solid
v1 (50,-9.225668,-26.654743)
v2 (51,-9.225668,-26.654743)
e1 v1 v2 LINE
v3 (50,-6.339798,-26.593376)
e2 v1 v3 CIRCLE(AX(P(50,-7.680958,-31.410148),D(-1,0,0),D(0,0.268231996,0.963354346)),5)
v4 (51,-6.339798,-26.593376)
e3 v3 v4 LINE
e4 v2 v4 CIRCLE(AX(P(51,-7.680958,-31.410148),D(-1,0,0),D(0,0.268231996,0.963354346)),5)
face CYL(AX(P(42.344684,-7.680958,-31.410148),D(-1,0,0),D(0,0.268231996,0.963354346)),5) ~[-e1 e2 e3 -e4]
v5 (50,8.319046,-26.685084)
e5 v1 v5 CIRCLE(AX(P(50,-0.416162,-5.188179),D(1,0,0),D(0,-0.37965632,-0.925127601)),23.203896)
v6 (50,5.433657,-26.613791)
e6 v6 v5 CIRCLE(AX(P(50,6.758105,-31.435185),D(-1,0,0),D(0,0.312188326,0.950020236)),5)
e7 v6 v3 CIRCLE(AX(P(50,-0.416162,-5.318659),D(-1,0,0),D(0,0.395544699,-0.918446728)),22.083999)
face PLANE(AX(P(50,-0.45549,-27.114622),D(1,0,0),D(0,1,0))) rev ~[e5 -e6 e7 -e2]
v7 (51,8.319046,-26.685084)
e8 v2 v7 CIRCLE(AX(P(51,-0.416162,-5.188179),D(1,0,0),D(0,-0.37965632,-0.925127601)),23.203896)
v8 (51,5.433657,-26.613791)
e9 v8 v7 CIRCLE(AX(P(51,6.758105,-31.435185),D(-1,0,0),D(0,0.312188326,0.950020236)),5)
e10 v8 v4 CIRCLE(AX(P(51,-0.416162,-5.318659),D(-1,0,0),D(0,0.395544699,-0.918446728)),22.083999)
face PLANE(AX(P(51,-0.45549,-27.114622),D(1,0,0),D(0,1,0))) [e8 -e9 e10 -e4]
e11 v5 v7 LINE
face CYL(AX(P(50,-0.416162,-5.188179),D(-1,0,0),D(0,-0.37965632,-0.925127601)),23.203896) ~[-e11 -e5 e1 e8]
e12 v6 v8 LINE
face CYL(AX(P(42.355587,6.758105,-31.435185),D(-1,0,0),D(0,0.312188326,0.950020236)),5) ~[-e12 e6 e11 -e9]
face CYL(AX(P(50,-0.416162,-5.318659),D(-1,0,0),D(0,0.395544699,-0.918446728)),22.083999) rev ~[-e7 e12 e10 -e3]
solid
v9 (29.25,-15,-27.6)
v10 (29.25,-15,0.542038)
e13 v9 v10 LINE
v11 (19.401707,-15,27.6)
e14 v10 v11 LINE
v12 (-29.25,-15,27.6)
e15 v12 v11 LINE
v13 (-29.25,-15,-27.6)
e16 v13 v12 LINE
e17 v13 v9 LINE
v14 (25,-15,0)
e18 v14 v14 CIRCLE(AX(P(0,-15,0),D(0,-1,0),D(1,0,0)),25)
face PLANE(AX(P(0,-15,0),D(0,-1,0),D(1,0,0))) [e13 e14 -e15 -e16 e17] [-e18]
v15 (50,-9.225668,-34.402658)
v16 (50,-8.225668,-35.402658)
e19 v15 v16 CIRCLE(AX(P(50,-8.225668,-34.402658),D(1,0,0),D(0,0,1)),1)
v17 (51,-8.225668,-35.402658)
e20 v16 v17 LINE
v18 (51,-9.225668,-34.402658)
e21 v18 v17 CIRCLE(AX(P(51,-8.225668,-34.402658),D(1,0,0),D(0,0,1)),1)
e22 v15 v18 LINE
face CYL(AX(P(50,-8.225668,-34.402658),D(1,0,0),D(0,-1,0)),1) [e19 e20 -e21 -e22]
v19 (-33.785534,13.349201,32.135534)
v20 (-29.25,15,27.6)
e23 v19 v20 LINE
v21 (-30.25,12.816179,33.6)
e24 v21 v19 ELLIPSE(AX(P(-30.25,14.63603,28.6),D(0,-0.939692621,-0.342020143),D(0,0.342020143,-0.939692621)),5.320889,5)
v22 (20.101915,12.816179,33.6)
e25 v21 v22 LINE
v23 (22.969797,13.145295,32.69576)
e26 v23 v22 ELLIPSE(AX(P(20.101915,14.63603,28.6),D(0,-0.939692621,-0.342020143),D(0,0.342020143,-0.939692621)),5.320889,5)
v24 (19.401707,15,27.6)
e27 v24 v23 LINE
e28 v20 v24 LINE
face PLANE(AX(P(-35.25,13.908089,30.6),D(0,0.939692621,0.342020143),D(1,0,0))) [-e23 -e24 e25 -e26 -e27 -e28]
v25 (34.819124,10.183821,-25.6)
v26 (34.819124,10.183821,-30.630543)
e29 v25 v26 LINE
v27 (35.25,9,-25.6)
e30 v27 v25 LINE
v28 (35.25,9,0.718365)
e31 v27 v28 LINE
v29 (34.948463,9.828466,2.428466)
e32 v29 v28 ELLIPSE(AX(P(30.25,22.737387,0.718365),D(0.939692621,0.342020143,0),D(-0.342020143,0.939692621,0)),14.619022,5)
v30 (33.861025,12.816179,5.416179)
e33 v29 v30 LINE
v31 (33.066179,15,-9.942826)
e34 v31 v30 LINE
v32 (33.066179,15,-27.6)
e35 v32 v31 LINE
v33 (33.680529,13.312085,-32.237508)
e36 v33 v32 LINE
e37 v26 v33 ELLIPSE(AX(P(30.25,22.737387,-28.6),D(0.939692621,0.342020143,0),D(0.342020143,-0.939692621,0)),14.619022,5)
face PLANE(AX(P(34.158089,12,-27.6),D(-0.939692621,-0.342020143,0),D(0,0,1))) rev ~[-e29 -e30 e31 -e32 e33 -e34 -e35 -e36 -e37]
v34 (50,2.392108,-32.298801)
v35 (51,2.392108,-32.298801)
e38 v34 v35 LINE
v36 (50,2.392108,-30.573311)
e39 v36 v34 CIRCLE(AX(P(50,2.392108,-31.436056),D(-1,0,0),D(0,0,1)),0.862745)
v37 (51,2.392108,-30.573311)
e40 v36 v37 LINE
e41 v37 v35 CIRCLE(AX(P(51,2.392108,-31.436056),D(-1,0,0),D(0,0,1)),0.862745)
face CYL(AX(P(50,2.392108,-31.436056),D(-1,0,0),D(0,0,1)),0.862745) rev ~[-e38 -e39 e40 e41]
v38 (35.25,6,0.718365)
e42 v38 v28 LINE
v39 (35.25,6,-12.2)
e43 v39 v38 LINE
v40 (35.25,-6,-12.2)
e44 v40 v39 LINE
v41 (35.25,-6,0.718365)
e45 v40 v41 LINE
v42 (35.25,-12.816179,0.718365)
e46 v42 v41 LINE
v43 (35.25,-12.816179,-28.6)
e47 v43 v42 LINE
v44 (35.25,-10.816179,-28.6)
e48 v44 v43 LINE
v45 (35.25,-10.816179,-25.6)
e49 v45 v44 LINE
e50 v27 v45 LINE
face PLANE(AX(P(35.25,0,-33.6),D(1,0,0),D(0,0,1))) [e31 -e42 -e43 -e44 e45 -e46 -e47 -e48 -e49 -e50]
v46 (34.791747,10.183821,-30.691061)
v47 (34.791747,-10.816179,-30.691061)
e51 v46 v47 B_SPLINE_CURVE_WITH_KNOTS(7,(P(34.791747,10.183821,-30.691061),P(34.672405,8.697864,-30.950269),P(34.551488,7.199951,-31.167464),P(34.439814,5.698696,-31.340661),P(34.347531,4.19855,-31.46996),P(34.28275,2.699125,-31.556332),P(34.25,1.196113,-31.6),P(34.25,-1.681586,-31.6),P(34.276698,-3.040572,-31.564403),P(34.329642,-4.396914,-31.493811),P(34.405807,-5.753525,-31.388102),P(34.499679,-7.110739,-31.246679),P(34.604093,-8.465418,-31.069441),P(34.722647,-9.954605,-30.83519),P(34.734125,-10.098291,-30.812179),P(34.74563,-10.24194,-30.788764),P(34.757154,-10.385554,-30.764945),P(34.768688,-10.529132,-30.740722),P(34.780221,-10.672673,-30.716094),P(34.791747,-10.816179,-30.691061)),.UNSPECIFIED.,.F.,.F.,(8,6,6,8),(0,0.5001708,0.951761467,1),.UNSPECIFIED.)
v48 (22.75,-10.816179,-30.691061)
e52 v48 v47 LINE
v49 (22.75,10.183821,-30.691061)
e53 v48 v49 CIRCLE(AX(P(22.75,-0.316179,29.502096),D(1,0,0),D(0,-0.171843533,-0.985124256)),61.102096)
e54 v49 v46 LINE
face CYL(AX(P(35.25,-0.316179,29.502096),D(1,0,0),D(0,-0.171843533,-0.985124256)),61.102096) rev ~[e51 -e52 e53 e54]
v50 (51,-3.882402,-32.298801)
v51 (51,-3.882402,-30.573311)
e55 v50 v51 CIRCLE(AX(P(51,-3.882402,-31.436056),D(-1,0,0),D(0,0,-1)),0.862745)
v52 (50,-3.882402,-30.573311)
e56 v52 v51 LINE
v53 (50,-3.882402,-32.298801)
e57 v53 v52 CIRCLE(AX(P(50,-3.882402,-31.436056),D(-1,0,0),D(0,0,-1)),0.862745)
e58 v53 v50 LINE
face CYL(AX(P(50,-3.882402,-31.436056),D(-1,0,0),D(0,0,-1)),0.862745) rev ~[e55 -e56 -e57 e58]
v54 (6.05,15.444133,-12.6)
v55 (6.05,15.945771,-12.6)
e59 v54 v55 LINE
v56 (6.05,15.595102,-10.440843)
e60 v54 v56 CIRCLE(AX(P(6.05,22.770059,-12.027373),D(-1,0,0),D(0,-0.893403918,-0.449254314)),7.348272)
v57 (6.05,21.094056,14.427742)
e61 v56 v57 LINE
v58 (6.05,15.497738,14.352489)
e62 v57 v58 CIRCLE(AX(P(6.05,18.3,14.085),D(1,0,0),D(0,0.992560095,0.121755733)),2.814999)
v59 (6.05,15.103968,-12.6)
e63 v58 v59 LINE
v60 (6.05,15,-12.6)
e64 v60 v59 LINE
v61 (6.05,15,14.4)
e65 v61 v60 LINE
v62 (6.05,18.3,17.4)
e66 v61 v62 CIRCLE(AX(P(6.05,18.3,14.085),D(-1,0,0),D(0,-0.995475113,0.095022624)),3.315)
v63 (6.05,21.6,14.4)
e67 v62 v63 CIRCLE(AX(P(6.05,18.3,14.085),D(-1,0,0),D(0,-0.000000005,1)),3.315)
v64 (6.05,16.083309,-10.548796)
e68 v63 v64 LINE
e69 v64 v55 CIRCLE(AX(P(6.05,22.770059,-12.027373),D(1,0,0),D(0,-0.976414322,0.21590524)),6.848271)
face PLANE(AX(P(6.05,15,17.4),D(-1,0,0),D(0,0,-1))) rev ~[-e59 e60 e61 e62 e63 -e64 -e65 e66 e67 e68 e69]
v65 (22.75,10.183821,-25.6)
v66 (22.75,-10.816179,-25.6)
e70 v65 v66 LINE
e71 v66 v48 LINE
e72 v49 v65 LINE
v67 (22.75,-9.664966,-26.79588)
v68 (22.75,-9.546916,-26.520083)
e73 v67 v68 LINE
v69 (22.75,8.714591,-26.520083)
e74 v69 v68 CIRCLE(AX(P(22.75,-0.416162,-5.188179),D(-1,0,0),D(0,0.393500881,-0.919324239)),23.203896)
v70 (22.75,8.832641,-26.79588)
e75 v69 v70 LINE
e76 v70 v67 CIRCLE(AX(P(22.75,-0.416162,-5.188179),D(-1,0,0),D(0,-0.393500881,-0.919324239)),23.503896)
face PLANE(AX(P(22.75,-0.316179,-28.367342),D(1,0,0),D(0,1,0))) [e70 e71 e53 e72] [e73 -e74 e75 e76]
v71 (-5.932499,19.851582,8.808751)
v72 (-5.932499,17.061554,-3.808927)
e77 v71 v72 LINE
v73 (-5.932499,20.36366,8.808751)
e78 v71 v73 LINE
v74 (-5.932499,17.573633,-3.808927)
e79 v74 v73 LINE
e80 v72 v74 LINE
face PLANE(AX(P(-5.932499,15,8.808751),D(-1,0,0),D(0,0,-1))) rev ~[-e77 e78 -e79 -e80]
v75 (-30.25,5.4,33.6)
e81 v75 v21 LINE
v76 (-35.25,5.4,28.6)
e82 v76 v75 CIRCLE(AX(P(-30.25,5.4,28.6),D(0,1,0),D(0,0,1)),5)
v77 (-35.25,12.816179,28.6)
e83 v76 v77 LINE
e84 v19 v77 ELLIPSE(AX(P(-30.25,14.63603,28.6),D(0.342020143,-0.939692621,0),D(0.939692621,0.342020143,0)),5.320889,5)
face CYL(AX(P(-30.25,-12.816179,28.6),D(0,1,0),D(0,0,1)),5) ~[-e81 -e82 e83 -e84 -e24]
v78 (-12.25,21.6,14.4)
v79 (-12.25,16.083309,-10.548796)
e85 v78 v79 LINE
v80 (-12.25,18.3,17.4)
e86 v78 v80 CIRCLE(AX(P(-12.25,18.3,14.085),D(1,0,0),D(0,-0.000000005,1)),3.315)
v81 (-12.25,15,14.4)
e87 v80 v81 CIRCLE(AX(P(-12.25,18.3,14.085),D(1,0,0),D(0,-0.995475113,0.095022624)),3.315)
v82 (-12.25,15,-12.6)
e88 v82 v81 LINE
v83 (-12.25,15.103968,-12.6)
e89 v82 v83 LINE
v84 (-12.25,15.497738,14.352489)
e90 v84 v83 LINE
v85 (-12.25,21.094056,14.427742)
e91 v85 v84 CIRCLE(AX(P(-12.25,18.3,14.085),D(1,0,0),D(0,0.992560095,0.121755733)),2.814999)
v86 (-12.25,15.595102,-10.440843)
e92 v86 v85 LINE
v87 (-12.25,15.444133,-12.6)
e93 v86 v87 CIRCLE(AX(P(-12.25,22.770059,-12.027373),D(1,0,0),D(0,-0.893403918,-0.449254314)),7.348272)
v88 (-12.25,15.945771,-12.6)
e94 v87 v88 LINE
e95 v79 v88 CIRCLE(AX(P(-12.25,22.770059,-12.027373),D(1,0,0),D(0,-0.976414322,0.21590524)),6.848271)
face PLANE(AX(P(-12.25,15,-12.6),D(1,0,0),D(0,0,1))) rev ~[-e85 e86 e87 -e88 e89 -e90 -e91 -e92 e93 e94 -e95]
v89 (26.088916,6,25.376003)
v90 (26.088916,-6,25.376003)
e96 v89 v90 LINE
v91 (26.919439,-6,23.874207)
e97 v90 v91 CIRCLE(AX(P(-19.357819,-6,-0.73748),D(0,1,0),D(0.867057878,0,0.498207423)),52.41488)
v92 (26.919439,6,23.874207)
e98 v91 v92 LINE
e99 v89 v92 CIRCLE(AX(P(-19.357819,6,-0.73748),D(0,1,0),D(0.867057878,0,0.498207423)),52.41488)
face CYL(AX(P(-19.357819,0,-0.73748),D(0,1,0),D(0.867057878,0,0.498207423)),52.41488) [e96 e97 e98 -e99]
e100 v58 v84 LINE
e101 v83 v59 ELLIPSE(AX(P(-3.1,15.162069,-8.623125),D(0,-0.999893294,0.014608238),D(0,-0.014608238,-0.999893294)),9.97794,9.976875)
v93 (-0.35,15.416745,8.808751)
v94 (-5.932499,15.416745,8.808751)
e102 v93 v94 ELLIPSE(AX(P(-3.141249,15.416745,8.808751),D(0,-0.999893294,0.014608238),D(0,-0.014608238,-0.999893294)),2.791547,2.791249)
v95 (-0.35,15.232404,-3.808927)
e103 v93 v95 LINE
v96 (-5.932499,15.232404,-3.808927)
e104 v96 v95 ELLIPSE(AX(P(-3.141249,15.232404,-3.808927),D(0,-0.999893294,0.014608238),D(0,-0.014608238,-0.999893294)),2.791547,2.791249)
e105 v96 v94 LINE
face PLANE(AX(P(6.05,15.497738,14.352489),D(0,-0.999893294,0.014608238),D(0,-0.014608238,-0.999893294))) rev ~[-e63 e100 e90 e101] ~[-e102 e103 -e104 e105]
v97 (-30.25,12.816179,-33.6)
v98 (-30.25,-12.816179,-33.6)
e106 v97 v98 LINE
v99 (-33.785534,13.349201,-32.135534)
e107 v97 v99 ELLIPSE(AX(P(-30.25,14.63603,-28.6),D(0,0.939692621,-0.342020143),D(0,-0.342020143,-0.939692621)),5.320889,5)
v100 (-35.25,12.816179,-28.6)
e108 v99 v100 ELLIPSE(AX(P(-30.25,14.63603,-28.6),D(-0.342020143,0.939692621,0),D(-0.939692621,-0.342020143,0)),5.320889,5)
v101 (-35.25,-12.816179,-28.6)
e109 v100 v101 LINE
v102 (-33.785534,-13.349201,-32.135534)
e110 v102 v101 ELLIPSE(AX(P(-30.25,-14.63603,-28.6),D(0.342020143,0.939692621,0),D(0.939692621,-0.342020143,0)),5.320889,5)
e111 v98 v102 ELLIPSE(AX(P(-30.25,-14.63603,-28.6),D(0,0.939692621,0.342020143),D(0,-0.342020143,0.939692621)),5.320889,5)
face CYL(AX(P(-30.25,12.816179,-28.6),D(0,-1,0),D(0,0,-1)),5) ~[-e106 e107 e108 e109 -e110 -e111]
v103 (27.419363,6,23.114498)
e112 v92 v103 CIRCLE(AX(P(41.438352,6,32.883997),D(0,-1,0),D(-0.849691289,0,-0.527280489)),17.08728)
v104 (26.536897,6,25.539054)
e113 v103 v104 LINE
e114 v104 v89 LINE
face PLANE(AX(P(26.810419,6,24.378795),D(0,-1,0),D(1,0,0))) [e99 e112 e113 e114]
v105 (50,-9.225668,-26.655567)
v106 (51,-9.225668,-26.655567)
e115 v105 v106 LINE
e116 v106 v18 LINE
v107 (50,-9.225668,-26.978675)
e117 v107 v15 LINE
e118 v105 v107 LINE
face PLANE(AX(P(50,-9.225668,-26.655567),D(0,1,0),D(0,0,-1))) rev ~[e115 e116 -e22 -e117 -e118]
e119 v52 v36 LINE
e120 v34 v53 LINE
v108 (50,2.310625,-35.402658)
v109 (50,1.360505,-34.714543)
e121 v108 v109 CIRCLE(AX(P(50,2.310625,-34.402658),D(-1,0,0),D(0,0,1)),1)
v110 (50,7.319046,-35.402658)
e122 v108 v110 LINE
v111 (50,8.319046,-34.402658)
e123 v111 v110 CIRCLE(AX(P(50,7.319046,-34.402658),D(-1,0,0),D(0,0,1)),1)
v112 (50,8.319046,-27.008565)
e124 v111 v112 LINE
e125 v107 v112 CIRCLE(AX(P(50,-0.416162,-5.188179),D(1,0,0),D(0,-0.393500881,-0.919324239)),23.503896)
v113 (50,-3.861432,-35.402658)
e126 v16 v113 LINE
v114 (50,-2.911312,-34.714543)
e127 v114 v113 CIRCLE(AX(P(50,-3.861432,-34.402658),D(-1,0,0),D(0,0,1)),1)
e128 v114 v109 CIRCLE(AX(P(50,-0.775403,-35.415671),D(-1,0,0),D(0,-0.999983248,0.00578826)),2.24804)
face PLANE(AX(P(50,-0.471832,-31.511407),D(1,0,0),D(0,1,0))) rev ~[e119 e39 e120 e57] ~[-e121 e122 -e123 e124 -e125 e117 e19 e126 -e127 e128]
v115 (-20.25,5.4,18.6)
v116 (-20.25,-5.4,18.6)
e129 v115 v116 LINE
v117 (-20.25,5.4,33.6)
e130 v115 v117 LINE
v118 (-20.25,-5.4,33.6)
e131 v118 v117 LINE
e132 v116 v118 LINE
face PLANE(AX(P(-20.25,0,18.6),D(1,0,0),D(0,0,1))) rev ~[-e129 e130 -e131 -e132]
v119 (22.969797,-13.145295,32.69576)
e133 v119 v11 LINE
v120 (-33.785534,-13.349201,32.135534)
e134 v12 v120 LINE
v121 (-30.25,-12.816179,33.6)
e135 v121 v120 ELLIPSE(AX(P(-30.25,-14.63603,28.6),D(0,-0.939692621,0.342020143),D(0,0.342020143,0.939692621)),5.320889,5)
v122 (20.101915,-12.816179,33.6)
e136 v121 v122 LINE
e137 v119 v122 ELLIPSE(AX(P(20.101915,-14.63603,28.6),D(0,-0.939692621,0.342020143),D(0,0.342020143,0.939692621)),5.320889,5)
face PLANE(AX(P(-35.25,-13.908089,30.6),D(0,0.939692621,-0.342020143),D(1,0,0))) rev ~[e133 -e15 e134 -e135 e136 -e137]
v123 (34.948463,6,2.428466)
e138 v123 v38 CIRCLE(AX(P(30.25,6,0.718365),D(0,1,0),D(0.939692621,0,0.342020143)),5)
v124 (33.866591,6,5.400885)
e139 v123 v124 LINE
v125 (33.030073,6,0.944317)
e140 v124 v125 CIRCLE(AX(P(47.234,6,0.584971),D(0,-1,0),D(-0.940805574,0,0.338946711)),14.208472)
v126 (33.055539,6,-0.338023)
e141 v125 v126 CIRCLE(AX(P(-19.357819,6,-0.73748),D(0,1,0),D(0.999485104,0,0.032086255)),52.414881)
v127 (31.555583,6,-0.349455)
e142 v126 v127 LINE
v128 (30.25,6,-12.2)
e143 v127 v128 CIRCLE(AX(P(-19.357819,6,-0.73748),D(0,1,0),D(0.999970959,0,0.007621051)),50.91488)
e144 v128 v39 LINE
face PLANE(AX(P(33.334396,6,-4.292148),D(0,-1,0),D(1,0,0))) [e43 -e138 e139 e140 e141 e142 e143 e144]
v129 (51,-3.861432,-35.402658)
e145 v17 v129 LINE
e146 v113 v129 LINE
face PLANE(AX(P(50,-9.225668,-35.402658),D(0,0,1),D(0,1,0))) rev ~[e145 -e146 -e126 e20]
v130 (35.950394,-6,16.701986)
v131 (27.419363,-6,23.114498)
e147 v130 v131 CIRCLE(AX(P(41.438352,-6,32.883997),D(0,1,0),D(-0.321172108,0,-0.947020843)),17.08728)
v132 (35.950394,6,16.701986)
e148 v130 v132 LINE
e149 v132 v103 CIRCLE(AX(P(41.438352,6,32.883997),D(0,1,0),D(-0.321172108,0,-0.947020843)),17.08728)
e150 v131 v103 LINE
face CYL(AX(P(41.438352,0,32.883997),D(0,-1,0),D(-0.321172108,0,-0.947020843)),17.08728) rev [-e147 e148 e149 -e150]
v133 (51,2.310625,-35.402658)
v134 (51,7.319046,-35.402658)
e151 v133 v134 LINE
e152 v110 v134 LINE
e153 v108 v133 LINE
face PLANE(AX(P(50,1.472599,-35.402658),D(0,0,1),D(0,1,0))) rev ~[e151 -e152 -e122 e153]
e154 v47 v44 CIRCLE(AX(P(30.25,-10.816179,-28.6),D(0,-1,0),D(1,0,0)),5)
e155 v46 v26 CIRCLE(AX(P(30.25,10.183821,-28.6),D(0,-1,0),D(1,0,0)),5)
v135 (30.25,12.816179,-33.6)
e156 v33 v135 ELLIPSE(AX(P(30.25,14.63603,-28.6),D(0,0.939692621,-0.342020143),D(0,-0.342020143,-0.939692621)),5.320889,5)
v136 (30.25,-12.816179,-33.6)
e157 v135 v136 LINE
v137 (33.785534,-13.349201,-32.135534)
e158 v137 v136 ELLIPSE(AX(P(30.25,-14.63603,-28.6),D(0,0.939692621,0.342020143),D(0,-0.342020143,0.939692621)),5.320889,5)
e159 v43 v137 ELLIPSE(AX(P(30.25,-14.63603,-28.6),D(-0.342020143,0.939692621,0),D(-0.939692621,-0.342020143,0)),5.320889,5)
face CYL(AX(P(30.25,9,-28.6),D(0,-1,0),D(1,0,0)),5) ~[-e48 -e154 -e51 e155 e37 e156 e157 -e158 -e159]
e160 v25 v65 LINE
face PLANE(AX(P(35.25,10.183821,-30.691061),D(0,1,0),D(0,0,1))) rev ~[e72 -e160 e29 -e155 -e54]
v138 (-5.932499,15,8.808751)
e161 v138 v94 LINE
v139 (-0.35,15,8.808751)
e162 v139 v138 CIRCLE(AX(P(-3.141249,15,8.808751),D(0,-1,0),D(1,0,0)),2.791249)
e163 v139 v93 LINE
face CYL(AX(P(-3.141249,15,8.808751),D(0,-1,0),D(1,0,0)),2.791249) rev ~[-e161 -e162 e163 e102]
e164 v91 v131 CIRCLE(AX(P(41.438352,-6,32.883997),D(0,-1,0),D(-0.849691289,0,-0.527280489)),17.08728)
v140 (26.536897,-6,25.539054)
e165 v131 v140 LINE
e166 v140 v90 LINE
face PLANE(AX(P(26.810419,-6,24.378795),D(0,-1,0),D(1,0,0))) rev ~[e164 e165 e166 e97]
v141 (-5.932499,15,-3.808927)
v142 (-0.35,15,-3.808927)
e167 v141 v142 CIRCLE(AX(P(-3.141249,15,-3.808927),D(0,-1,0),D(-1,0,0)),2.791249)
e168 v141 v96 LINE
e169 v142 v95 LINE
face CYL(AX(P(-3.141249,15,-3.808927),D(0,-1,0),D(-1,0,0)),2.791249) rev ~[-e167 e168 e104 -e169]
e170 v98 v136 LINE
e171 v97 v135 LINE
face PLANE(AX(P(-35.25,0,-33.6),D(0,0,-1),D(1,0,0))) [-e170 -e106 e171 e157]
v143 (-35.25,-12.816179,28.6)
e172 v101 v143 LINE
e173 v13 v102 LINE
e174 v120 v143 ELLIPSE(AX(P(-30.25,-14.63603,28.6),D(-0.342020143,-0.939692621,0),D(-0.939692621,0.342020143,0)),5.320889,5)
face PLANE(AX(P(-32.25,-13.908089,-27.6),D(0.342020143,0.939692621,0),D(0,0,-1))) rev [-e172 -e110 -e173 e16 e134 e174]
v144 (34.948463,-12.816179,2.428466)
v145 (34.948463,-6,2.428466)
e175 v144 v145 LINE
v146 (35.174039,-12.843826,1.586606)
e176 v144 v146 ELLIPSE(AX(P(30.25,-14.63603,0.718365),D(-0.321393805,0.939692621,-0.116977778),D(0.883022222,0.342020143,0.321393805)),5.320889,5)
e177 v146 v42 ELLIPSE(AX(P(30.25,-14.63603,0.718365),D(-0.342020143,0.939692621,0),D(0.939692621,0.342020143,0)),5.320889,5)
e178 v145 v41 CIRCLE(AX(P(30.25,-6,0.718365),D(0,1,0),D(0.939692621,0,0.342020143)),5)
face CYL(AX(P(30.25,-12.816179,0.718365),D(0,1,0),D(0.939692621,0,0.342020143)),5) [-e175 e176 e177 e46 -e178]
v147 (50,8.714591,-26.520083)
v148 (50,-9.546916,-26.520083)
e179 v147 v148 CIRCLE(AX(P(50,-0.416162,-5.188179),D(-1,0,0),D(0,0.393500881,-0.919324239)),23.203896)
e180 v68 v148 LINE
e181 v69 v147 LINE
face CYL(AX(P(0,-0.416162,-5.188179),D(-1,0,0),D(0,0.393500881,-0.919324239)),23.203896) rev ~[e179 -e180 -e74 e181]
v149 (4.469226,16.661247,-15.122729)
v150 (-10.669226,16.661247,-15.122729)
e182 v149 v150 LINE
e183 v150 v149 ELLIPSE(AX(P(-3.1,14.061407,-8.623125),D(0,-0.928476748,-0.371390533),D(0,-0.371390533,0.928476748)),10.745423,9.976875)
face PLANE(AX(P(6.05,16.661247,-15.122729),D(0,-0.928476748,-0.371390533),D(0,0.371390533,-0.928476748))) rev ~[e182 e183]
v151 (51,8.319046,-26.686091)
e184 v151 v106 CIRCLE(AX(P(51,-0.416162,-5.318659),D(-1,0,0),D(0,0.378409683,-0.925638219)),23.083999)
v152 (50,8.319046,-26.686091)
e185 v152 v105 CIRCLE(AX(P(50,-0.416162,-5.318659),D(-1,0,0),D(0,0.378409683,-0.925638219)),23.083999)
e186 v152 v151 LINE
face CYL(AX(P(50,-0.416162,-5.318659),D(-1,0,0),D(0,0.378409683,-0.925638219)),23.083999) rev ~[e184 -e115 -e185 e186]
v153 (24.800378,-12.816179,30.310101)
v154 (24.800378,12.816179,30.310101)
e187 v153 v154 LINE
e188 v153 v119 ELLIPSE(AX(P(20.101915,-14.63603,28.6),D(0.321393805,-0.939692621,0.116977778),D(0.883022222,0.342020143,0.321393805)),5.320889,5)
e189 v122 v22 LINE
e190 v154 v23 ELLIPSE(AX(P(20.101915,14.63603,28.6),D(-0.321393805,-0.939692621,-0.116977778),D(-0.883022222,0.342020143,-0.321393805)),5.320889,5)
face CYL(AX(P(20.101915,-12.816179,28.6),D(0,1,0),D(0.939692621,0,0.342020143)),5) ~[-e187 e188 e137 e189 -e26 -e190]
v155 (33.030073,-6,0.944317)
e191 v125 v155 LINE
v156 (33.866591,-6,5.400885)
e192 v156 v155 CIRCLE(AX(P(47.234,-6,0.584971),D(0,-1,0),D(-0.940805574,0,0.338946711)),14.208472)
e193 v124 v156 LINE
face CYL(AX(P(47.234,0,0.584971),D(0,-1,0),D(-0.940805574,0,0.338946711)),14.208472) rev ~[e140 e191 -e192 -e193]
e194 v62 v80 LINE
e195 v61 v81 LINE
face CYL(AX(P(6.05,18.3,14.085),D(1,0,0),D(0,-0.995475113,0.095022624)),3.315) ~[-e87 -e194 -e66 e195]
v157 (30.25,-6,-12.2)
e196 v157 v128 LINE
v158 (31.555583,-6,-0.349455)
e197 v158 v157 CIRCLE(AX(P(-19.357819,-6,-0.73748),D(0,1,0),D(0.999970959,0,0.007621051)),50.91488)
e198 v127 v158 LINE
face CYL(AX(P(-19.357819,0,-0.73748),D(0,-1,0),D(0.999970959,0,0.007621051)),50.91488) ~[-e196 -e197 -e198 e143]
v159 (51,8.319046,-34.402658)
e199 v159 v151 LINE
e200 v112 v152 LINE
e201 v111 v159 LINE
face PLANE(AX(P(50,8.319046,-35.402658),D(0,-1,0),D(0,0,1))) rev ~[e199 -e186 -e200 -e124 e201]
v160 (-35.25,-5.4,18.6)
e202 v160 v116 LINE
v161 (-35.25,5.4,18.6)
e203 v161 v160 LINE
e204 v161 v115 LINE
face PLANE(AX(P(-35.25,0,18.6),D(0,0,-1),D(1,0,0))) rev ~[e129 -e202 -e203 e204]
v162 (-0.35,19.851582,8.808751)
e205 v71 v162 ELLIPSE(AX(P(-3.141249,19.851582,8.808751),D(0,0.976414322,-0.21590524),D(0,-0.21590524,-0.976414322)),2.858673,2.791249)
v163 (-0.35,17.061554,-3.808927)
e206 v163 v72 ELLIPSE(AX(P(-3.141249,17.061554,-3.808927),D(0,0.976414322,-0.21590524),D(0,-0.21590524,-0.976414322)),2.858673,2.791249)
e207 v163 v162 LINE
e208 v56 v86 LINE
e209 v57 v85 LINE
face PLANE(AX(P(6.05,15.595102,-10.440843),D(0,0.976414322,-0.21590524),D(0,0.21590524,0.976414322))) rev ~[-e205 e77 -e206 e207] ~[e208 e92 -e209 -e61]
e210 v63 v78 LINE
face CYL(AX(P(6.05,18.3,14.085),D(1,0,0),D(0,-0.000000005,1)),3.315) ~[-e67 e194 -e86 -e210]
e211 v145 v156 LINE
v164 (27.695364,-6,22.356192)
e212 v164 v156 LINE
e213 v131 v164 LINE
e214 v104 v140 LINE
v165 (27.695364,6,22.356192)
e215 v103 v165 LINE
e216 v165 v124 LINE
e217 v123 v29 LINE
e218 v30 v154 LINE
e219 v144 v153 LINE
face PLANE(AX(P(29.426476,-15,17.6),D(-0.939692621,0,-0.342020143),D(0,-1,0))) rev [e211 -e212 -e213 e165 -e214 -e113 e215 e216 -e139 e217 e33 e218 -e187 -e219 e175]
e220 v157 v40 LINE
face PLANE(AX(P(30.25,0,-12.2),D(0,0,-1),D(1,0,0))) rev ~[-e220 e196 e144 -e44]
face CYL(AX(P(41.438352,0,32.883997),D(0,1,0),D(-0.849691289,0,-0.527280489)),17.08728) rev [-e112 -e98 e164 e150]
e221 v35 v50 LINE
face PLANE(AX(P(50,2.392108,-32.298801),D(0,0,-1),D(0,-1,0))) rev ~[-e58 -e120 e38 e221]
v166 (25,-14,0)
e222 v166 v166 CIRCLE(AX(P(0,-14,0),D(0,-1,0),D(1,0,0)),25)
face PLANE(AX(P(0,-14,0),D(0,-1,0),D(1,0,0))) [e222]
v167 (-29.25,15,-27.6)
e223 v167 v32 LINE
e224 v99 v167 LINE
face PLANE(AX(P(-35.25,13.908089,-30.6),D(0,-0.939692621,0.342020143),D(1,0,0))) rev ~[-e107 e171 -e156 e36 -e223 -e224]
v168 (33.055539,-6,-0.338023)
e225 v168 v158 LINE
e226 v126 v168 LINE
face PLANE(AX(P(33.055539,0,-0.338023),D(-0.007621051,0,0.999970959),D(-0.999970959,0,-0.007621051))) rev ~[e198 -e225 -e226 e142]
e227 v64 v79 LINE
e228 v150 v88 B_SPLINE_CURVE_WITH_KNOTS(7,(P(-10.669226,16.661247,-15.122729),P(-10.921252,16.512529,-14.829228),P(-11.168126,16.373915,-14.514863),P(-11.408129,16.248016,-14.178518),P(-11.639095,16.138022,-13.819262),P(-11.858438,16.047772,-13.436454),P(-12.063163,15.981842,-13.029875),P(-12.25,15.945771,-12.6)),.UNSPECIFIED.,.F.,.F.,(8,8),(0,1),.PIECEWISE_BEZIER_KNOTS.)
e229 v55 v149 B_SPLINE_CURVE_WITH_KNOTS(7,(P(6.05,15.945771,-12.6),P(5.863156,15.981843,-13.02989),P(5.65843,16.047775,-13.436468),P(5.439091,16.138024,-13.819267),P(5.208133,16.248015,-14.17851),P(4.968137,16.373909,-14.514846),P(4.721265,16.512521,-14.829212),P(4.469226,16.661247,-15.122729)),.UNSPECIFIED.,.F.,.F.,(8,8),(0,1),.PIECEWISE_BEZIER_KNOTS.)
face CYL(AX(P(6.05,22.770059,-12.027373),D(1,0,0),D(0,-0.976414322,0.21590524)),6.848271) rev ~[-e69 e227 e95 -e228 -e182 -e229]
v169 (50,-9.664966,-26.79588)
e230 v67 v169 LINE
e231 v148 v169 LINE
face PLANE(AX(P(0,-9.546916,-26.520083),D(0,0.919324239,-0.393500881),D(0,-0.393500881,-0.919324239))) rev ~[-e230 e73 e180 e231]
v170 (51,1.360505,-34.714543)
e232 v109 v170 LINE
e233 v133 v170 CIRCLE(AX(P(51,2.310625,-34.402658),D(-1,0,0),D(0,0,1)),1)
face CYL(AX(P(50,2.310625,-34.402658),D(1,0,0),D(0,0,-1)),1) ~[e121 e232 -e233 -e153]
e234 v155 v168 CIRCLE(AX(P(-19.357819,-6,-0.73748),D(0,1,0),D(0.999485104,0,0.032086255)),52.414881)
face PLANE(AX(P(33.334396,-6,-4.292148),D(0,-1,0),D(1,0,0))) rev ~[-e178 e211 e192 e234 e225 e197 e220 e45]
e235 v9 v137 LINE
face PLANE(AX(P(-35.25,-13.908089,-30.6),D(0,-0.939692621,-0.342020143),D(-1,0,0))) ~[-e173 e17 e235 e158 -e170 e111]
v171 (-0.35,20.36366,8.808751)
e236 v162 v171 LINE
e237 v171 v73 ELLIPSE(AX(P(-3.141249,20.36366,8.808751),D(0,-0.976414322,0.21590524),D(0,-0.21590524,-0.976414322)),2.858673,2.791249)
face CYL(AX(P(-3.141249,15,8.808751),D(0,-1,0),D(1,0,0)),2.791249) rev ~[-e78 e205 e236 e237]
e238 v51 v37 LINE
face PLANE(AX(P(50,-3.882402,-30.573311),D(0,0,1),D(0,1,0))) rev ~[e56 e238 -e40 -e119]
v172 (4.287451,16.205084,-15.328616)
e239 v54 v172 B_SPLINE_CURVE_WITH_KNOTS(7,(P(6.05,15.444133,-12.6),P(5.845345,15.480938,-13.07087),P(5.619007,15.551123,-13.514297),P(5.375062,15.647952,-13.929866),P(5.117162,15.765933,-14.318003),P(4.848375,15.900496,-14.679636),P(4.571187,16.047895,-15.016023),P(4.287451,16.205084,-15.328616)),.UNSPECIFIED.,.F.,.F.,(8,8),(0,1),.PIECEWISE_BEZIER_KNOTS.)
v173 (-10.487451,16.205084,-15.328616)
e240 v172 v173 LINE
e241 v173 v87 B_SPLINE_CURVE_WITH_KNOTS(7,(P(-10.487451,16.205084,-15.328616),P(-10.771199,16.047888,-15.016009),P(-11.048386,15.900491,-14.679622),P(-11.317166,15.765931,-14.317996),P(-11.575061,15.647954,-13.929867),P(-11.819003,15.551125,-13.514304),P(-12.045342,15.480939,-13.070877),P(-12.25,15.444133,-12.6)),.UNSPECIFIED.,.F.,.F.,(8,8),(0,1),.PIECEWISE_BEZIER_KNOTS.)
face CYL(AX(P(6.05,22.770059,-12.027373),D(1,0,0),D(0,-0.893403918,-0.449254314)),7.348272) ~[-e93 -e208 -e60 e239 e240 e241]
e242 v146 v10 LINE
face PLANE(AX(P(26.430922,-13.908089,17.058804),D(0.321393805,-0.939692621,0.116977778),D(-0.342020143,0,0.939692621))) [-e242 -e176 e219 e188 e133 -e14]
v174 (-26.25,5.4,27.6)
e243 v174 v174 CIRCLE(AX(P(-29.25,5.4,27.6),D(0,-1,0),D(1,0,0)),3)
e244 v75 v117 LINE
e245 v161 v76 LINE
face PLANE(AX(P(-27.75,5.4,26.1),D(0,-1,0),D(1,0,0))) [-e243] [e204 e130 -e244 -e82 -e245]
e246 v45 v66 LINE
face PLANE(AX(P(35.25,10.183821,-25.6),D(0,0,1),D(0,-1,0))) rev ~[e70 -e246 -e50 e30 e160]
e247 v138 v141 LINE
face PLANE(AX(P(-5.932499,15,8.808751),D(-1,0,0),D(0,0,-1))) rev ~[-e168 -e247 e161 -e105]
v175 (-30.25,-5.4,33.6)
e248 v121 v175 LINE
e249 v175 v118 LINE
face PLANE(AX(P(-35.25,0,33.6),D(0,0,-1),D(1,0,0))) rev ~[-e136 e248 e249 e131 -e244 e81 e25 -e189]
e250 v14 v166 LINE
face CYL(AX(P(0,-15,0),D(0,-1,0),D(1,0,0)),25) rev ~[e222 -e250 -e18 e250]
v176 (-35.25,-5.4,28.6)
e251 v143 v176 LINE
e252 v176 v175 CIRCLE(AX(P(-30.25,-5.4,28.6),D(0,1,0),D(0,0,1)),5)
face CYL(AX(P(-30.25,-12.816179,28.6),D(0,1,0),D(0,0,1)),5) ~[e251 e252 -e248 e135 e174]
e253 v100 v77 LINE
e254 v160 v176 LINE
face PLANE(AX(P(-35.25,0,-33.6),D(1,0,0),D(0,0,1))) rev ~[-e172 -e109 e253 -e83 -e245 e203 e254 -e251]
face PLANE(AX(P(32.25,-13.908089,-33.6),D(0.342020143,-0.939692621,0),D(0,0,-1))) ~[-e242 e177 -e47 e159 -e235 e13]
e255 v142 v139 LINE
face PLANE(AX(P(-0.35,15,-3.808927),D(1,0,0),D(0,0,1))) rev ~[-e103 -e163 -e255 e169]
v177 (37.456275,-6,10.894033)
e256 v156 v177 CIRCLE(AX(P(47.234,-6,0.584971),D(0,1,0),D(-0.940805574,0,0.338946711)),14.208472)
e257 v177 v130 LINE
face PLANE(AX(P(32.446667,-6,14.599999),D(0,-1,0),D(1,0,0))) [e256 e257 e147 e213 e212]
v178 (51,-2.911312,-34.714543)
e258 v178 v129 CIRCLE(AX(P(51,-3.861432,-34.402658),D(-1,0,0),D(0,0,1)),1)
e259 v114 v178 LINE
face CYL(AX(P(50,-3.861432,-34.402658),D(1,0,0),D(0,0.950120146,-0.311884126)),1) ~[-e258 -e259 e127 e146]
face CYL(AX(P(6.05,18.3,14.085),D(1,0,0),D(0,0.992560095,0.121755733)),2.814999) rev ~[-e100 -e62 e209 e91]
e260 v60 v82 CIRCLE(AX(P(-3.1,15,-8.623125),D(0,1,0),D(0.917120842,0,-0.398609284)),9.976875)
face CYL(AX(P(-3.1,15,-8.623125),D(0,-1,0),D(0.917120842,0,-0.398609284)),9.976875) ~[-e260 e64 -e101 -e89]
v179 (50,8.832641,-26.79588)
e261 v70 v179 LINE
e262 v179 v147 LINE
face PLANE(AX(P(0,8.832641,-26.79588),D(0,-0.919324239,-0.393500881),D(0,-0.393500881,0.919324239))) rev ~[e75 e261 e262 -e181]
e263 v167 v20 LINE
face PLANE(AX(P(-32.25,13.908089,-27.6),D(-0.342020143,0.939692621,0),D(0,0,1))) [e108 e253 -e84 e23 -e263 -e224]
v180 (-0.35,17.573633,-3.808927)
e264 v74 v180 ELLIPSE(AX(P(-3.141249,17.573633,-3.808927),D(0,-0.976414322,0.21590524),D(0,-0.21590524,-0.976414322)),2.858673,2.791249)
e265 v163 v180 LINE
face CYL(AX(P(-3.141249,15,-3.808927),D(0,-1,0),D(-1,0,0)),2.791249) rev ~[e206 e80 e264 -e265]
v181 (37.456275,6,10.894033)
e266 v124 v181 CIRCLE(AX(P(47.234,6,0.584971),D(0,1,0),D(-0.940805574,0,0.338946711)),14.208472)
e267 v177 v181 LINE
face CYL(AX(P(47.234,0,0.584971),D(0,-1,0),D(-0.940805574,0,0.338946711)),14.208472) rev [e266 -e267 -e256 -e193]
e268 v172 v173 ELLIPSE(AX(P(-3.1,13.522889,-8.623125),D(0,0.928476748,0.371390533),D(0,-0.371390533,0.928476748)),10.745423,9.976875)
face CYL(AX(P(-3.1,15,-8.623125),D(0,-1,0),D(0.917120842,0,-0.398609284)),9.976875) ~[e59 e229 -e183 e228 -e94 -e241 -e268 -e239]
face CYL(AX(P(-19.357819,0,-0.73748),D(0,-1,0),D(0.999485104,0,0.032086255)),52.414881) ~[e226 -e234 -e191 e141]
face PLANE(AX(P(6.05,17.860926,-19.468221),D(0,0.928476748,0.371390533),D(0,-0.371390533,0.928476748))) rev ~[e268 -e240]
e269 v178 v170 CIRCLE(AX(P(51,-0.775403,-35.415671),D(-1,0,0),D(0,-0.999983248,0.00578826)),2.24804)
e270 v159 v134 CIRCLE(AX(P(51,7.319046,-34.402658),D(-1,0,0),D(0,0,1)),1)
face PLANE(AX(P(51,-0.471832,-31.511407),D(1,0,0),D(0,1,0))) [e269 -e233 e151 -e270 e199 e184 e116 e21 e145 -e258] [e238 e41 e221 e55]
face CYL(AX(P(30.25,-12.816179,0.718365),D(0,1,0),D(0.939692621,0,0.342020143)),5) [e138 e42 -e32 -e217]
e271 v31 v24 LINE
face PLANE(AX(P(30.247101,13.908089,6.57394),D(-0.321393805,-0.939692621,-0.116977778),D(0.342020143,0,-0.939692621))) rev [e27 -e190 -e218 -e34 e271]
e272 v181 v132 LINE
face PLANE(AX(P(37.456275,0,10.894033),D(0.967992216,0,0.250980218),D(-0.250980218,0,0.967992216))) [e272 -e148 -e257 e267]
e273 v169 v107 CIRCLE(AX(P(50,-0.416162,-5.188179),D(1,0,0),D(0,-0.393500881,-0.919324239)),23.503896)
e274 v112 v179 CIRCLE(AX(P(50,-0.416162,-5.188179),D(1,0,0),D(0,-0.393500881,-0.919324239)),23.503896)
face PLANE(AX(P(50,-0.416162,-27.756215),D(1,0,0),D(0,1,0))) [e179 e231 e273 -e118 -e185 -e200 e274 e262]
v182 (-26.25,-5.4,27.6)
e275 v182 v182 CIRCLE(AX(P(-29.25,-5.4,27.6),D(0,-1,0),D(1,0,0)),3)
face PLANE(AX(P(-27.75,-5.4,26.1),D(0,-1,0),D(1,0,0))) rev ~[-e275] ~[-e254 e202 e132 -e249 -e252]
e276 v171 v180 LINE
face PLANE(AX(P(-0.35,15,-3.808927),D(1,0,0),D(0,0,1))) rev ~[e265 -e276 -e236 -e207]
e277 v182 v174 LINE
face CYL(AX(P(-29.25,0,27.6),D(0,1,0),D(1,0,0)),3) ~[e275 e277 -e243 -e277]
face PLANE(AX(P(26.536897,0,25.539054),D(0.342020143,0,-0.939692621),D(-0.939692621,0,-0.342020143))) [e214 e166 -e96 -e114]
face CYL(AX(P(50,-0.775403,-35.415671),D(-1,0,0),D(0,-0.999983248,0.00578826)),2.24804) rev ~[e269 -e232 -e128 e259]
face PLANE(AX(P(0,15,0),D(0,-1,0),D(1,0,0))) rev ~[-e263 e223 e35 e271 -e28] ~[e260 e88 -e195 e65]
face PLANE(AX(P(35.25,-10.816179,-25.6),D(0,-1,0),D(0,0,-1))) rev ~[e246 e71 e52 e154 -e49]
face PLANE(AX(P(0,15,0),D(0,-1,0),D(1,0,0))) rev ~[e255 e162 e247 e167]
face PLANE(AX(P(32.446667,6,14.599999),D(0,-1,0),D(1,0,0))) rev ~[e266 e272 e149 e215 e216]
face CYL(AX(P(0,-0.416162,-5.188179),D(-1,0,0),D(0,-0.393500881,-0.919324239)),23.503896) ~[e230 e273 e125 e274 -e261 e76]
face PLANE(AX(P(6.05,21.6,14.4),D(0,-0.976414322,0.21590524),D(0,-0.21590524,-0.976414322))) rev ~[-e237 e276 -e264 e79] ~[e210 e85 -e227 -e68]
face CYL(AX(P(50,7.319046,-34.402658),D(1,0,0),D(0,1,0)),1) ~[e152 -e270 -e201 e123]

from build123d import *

# Parameters (mm, degrees)
F0_W          = 70.5
F0_H          = 67.2
F1_DEPTH      = 15
F2_SIZE2      = 11.6470474965
F2_SIZE       = 32
F3_R          = 25
F4_DEPTH      = 1
F6_DEPTH      = 6.6
F9_DEPTH      = 25
F10_C1_SIZE2  = 6
F10_C1_SIZE   = 2.1838214056
F10_C2_SIZE2  = 6
F10_C2_SIZE   = 2.1838214056
F10_C3_SIZE2  = 2.1838214056
F10_C3_SIZE   = 6
F10_C4_SIZE2  = 6
F10_C4_SIZE   = 2.1838214056
F10_C5_SIZE2  = 2.1838214056
F10_C5_SIZE   = 6
F10_C6_SIZE2  = 2.1838214056
F10_C6_SIZE   = 6
F10_C7_SIZE2  = 6
F10_C7_SIZE   = 2.1838214056
F10_C8_SIZE2  = 2.1838214056
F10_C8_SIZE   = 6
F10_C9_SIZE2  = 6
F10_C9_SIZE   = 2.1838214056
F10_C10_SIZE2 = 2.1838214056
F10_C10_SIZE  = 6
F11_R         = 5
F12_W         = 15
F12_H         = 15
F12_R         = 3
F13_DEPTH     = 5.4
F15_DEPTH     = 6
F16_DEPTH     = 6
F18_DEPTH     = 12.5
F20_DEPTH     = 50
F22_DEPTH     = 1
F23_T1_DEPTH  = 16.310631425
F23_T3_DEPTH  = 16.288826013
F24_R         = 1


# Not quite as in the source:
# - a fillet or chamfer that OpenCascade refuses, or shapes differently, is made with other operations: its cross-section is extruded or revolved along the edge and cut away or added


with BuildPart() as f1:
    # F0 (on Front) → F1 (new body, symmetric)
    with BuildSketch(Plane.XZ):
        Rectangle(F0_W, F0_H)
    extrude(amount=F1_DEPTH, both=True)

    # F2
    f2_edges = [f1.edges().sort_by_distance(p)[0] for p in [
        (35.25, 0, 33.6),
    ]]
    f2_side = f1.faces().sort_by_distance((35.25, 0, 0))[0]
    chamfer(f2_edges, length=F2_SIZE, length2=F2_SIZE2, reference=f2_side)

    # F3 (on face) → F4 (cut)
    with BuildSketch(Plane.XZ.offset(15)):
        Circle(F3_R)
    extrude(amount=-F4_DEPTH, mode=Mode.SUBTRACT)

    # F5 (on face) → F6 (join)
    with BuildSketch(Plane(origin=(0, 15, 0), x_dir=(-1, 0, 0), z_dir=(0, 1, 0))):
        with BuildLine():
            Line((12.25, 17.4), (-6.05, 17.4))
            Line((-6.05, 17.4), (-6.05, -12.6))
            ThreePointArc((-6.05, -12.6), (3.1, -18.6), (12.25, -12.6))
            Line((12.25, -12.6), (12.25, 17.4))
        make_face()
        with BuildLine():
            Line((5.9324988522, 8.8087505739), (5.9324988522, -3.8089272891))
            ThreePointArc((5.9324988522, -3.8089272891), (3.1412494261, -6.6001767152), (0.35, -3.8089272891))
            Line((0.35, -3.8089272891), (0.35, 8.8087505739))
            ThreePointArc((0.35, 8.8087505739), (3.1412494261, 11.6), (5.9324988522, 8.8087505739))
        make_face(mode=Mode.SUBTRACT)
    extrude(amount=F6_DEPTH)

    # F8 (on face) → F9 (cut)
    with BuildSketch(Plane.YZ.offset(6.05)):
        with BuildLine():
            Line((21.6, 14.4), (21.6, 17.4))
            Line((21.6, 17.4), (18.2999999846, 17.4))
            ThreePointArc((18.2999999846, 17.4), (20.5299103064, 16.5379013485), (21.6, 14.4))
        make_face()
        with BuildLine():
            Line((22.0904313028, -19.2825254053), (21.6, 14.4))
            Line((21.6, 14.4), (16.0833094269, -10.5487955734))
            ThreePointArc((16.0833094269, -10.5487955734), (15.9758103305, -12.88585804), (16.6612472385, -15.1227293536))
            Line((16.6612472385, -15.1227293536), (18.3251649141, -19.2825254053))
            Line((18.3251649141, -19.2825254053), (22.0904313028, -19.2825254053))
        make_face()
        with BuildLine():
            ThreePointArc((15, 14.4), (16.0700896822, 16.5379013381), (18.2999999846, 17.4))
            Line((18.2999999846, 17.4), (15, 17.4))
            Line((15, 17.4), (15, 14.4))
        make_face()
        with BuildLine():
            Line((15.5951015153, -10.4408427876), (21.0940559032, 14.427742295))
            ThreePointArc((21.0940559032, 14.427742295), (18.2621501284, 16.899744759), (15.497738322, 14.3524886147))
            Line((15.497738322, 14.3524886147), (15, -19.7163168341))
            Line((15, -19.7163168341), (17.8609258261, -19.4682209573))
            Line((17.8609258261, -19.4682209573), (16.2050844974, -15.328615782))
            ThreePointArc((16.2050844974, -15.328615782), (15.4783504264, -12.9373618021), (15.5951015153, -10.4408427876))
        make_face()
    extrude(amount=-F9_DEPTH, mode=Mode.SUBTRACT)

    # F10: chamfer of 6 x 2.1838214056 on 10 edges, made by hand

    # F10_c1
    f10_c1_edges = [f1.edges().sort_by_distance(p)[0] for p in [
        (-5.8235237483, 15, 33.6),
    ]]
    f10_c1_side = f1.faces().sort_by_distance((-5.8235237483, 14.9563235719, 33.6))[0]
    chamfer(f10_c1_edges, length=F10_C1_SIZE, length2=F10_C1_SIZE2, reference=f10_c1_side)

    # F10_c2
    f10_c2_edges = [f1.edges().sort_by_distance(p)[0] for p in [
        (-5.8235237483, -15, 33.6),
    ]]
    f10_c2_side = f1.faces().sort_by_distance((-5.8235237483, -14.9563235719, 33.6))[0]
    chamfer(f10_c2_edges, length=F10_C2_SIZE, length2=F10_C2_SIZE2, reference=f10_c2_side)

    # F10_c3
    f10_c3_edges = [f1.edges().sort_by_distance(p)[0] for p in [
        (35.25, -15, -16),
    ]]
    f10_c3_side = f1.faces().sort_by_distance((35.2063235719, -15, -16))[0]
    chamfer(f10_c3_edges, length=F10_C3_SIZE, length2=F10_C3_SIZE2, reference=f10_c3_side)

    # F10_c4
    f10_c4_edges = [f1.edges().sort_by_distance(p)[0] for p in [
        (27.5183869545, -15, 22.8424322584),
    ]]
    f10_c4_side = f1.faces().sort_by_distance((27.5183869545, -14.9563235719, 22.8424322584))[0]
    chamfer(f10_c4_edges, length=F10_C4_SIZE, length2=F10_C4_SIZE2, reference=f10_c4_side)

    # F10_c5
    f10_c5_edges = [f1.edges().sort_by_distance(p)[0] for p in [
        (-3, -15, -33.6),
    ]]
    f10_c5_side = f1.faces().sort_by_distance((-3, -15, -33.5563235719))[0]
    chamfer(f10_c5_edges, length=F10_C5_SIZE, length2=F10_C5_SIZE2, reference=f10_c5_side)

    # F10_c6
    f10_c6_edges = [f1.edges().sort_by_distance(p)[0] for p in [
        (-35.25, -15, 0),
    ]]
    f10_c6_side = f1.faces().sort_by_distance((-35.2063235719, -15, 0))[0]
    chamfer(f10_c6_edges, length=F10_C6_SIZE, length2=F10_C6_SIZE2, reference=f10_c6_side)

    # F10_c7
    f10_c7_edges = [f1.edges().sort_by_distance(p)[0] for p in [
        (0, 15, -33.6),
    ]]
    f10_c7_side = f1.faces().sort_by_distance((0, 14.9563235719, -33.6))[0]
    chamfer(f10_c7_edges, length=F10_C7_SIZE, length2=F10_C7_SIZE2, reference=f10_c7_side)

    # F10_c8
    f10_c8_edges = [f1.edges().sort_by_distance(p)[0] for p in [
        (35.25, 15, -13),
    ]]
    f10_c8_side = f1.faces().sort_by_distance((35.25, 14.9563235719, -13))[0]
    chamfer(f10_c8_edges, length=F10_C8_SIZE, length2=F10_C8_SIZE2, reference=f10_c8_side)

    # F10_c9
    f10_c9_edges = [f1.edges().sort_by_distance(p)[0] for p in [
        (-35.25, 15, 0),
    ]]
    f10_c9_side = f1.faces().sort_by_distance((-35.25, 14.9563235719, 0))[0]
    chamfer(f10_c9_edges, length=F10_C9_SIZE, length2=F10_C9_SIZE2, reference=f10_c9_side)

    # F10_c10
    f10_c10_edges = [f1.edges().sort_by_distance(p)[0] for p in [
        (29.4264762517, 15, 17.6),
    ]]
    f10_c10_side = f1.faces().sort_by_distance((29.3854338345, 15, 17.5850617818))[0]
    chamfer(f10_c10_edges, length=F10_C10_SIZE, length2=F10_C10_SIZE2, reference=f10_c10_side)

    # F11
    f11_edges = [f1.edges().sort_by_distance(p)[0] for p in [
        (-35.25, 0, 33.6),
        (23.602953, 0, 33.6),
        (35.25, -1.908089, 1.6),
        (35.25, -1.908089, -33.6),
        (-35.25, 0, -33.6),
    ]]
    fillet(f11_edges, radius=F11_R)

    # F12 (on Front) → F13 (cut, symmetric)
    with BuildSketch(Plane.XZ):
        with Locations((-27.75, 26.1)):
            Rectangle(F12_W, F12_H)
        with Locations((-29.25, 27.6)):
            Circle(F12_R, mode=Mode.SUBTRACT)
    extrude(amount=F13_DEPTH, both=True, mode=Mode.SUBTRACT)

    # F14 (on Front) → F15 (cut, symmetric)
    with BuildSketch(Plane.XZ):
        with BuildLine():
            Line((27.4193631632, 23.1144978891), (26.5368968656, 25.5390541151))
            Line((26.5368968656, 25.5390541151), (26.0889162393, 25.3760025016))
            ThreePointArc((26.0889162393, 25.3760025016), (26.5103242265, 24.6285041011), (26.9194386018, 23.8742070918))
            ThreePointArc((26.9194386018, 23.8742070918), (27.1643457119, 23.4910259493), (27.4193631632, 23.1144978891))
        make_face()
        with BuildLine():
            Line((35.25, 1.6), (33.866590897, 5.4008852724))
            ThreePointArc((33.866590897, 5.4008852724), (33.2694059355, 3.2061865059), (33.0300734223, 0.9443172563))
            ThreePointArc((33.0300734223, 0.9443172563), (33.0467289701, 0.3032247951), (33.0555394962, -0.3380234608))
            Line((33.0555394962, -0.3380234608), (31.5555830572, -0.3494550379))
            ThreePointArc((31.5555830572, -0.3494550379), (31.2508544156, -6.3130738574), (30.25, -12.2))
            Line((30.25, -12.2), (35.25, -12.2))
            Line((35.25, -12.2), (35.25, 1.6))
        make_face()
    extrude(amount=F15_DEPTH, both=True, mode=Mode.SUBTRACT)

    # F14 (on Front) → F16 (join, symmetric)
    with BuildSketch(Plane.XZ):
        with BuildLine():
            ThreePointArc((35.9503940222, 16.7019859811), (31.171399147, 19.2251228923), (27.4193631632, 23.1144978891))
            Line((27.4193631632, 23.1144978891), (27.695363868, 22.3561921849))
            Line((27.695363868, 22.3561921849), (33.866590897, 5.4008852724))
            ThreePointArc((33.866590897, 5.4008852724), (35.3399690851, 8.3575306064), (37.4562753297, 10.8940326852))
            Line((37.4562753297, 10.8940326852), (35.9503940222, 16.7019859811))
        make_face()
    extrude(amount=F16_DEPTH, both=True)

    # F17 (on face) → F18 (cut, symmetric)
    with BuildSketch(Plane.YZ.offset(35.25)):
        with BuildLine():
            Line((-10.8161785944, -25.6), (-10.8161785944, -30.691060879))
            ThreePointArc((-10.8161785944, -30.691060879), (-0.3161785944, -31.6), (10.1838214056, -30.691060879))
            Line((10.1838214056, -30.691060879), (10.1838214056, -25.6))
            Line((10.1838214056, -25.6), (-10.8161785944, -25.6))
        make_face()
    extrude(amount=F18_DEPTH, both=True, mode=Mode.SUBTRACT)

    # F19 (on Right) → F20 (join)
    with BuildSketch(Plane.YZ):
        with BuildLine():
            ThreePointArc((8.714591153, -26.5200827271), (-0.4161624238, -28.3920747054), (-9.5469160005, -26.5200827271))
            Line((-9.5469160005, -26.5200827271), (-9.6649662649, -26.7958799988))
            ThreePointArc((-9.6649662649, -26.7958799988), (-0.4161624238, -28.6920747054), (8.8326414173, -26.7958799988))
            Line((8.8326414173, -26.7958799988), (8.714591153, -26.5200827271))
        make_face()
    extrude(amount=F20_DEPTH)

    # F21 (on face) → F22 (join)
    with BuildSketch(Plane.YZ.offset(50)):
        with BuildLine():
            ThreePointArc((8.3190464543, -27.0085648953), (-0.4562043728, -28.692040597), (-9.2256682302, -26.9786751448))
            Line((-9.2256682302, -26.9786751448), (-9.2256682302, -35.402658417))
            Line((-9.2256682302, -35.402658417), (-3.023406025, -35.402658417))
            ThreePointArc((-3.023406025, -35.402658417), (-0.7754032849, -33.1676302601), (1.4725994552, -35.402658417))
            Line((1.4725994552, -35.402658417), (8.3190464543, -35.402658417))
            Line((8.3190464543, -35.402658417), (8.3190464543, -27.0085648953))
        make_face()
        with BuildLine():
            ThreePointArc((-3.8824020182, -32.2988011143), (-4.7451472338, -31.4360558987), (-3.8824020182, -30.573310683))
            Line((-3.8824020182, -30.573310683), (2.3921075505, -30.573310683))
            ThreePointArc((2.3921075505, -30.573310683), (3.2548527662, -31.4360558987), (2.3921075505, -32.2988011143))
            Line((2.3921075505, -32.2988011143), (-3.8824020182, -32.2988011143))
        make_face(mode=Mode.SUBTRACT)
        with BuildLine():
            ThreePointArc((8.3190464543, -26.686091106), (-0.4563238607, -28.4026234806), (-9.2256682302, -26.6555668451))
            Line((-9.2256682302, -26.6555668451), (-9.2256682302, -26.9786751448))
            ThreePointArc((-9.2256682302, -26.9786751448), (-0.4562043728, -28.692040597), (8.3190464543, -27.0085648953))
            Line((8.3190464543, -27.0085648953), (8.3190464543, -26.686091106))
        make_face()
    extrude(amount=F22_DEPTH)

    # F24
    f24_edges = [f1.edges().sort_by_distance(p)[0] for p in [
        (50.5, -9.225668, -35.402658),
        (50.5, 8.319046, -35.402658),
        (50.5, 1.472599, -35.402658),
        (50.5, -3.023406, -35.402658),
    ]]
    fillet(f24_edges, radius=F24_R)


with BuildPart() as f22:
    # F21 (on face) → F22, piece 2 (new body)
    with BuildSketch(Plane.YZ.offset(50)):
        with BuildLine():
            Line((-9.2256682302, -25.5694771946), (-9.2256682302, -26.6547433463))
            ThreePointArc((-9.2256682302, -26.6547433463), (-0.4562889695, -28.3920400099), (8.3190464543, -26.6850835031))
            Line((8.3190464543, -26.6850835031), (8.3190464543, -25.6016359995))
            ThreePointArc((8.3190464543, -25.6016359995), (-0.4566414995, -27.4026213187), (-9.2256682302, -25.5694771946))
        make_face()
    extrude(amount=F22_DEPTH)

    # F23: fillet of radius 5 on 2 edges, made by hand

    # F23_s2 → F23_t1 (cut)
    with BuildSketch(Plane.YZ.offset(42.3446842875)):
        with BuildLine():
            ThreePointArc((-6.3397976534, -26.5933758219), (-7.7872577117, -26.4112776514), (-9.2256682302, -26.6547433463))
            Line((-9.2256682302, -26.6547433463), (-9.2256682302, -25.5694771946))
            ThreePointArc((-9.2256682302, -25.5694771946), (-7.8005008028, -26.131505438), (-6.3397976534, -26.5933758219))
        make_face()
    extrude(amount=F23_T1_DEPTH, mode=Mode.SUBTRACT)

    # F23_s4 → F23_t3 (cut)
    with BuildSketch(Plane.YZ.offset(42.3555869935)):
        with BuildLine():
            ThreePointArc((8.3190464543, -26.6850835031), (6.8816079641, -26.4367102191), (5.4336572883, -26.6137908268))
            ThreePointArc((5.4336572883, -26.6137908268), (6.8938908655, -26.1577125068), (8.3190464543, -25.6016359995))
            Line((8.3190464543, -25.6016359995), (8.3190464543, -26.6850835031))
        make_face()
    extrude(amount=F23_T3_DEPTH, mode=Mode.SUBTRACT)


solid = Compound([f1.part, f22.part])
